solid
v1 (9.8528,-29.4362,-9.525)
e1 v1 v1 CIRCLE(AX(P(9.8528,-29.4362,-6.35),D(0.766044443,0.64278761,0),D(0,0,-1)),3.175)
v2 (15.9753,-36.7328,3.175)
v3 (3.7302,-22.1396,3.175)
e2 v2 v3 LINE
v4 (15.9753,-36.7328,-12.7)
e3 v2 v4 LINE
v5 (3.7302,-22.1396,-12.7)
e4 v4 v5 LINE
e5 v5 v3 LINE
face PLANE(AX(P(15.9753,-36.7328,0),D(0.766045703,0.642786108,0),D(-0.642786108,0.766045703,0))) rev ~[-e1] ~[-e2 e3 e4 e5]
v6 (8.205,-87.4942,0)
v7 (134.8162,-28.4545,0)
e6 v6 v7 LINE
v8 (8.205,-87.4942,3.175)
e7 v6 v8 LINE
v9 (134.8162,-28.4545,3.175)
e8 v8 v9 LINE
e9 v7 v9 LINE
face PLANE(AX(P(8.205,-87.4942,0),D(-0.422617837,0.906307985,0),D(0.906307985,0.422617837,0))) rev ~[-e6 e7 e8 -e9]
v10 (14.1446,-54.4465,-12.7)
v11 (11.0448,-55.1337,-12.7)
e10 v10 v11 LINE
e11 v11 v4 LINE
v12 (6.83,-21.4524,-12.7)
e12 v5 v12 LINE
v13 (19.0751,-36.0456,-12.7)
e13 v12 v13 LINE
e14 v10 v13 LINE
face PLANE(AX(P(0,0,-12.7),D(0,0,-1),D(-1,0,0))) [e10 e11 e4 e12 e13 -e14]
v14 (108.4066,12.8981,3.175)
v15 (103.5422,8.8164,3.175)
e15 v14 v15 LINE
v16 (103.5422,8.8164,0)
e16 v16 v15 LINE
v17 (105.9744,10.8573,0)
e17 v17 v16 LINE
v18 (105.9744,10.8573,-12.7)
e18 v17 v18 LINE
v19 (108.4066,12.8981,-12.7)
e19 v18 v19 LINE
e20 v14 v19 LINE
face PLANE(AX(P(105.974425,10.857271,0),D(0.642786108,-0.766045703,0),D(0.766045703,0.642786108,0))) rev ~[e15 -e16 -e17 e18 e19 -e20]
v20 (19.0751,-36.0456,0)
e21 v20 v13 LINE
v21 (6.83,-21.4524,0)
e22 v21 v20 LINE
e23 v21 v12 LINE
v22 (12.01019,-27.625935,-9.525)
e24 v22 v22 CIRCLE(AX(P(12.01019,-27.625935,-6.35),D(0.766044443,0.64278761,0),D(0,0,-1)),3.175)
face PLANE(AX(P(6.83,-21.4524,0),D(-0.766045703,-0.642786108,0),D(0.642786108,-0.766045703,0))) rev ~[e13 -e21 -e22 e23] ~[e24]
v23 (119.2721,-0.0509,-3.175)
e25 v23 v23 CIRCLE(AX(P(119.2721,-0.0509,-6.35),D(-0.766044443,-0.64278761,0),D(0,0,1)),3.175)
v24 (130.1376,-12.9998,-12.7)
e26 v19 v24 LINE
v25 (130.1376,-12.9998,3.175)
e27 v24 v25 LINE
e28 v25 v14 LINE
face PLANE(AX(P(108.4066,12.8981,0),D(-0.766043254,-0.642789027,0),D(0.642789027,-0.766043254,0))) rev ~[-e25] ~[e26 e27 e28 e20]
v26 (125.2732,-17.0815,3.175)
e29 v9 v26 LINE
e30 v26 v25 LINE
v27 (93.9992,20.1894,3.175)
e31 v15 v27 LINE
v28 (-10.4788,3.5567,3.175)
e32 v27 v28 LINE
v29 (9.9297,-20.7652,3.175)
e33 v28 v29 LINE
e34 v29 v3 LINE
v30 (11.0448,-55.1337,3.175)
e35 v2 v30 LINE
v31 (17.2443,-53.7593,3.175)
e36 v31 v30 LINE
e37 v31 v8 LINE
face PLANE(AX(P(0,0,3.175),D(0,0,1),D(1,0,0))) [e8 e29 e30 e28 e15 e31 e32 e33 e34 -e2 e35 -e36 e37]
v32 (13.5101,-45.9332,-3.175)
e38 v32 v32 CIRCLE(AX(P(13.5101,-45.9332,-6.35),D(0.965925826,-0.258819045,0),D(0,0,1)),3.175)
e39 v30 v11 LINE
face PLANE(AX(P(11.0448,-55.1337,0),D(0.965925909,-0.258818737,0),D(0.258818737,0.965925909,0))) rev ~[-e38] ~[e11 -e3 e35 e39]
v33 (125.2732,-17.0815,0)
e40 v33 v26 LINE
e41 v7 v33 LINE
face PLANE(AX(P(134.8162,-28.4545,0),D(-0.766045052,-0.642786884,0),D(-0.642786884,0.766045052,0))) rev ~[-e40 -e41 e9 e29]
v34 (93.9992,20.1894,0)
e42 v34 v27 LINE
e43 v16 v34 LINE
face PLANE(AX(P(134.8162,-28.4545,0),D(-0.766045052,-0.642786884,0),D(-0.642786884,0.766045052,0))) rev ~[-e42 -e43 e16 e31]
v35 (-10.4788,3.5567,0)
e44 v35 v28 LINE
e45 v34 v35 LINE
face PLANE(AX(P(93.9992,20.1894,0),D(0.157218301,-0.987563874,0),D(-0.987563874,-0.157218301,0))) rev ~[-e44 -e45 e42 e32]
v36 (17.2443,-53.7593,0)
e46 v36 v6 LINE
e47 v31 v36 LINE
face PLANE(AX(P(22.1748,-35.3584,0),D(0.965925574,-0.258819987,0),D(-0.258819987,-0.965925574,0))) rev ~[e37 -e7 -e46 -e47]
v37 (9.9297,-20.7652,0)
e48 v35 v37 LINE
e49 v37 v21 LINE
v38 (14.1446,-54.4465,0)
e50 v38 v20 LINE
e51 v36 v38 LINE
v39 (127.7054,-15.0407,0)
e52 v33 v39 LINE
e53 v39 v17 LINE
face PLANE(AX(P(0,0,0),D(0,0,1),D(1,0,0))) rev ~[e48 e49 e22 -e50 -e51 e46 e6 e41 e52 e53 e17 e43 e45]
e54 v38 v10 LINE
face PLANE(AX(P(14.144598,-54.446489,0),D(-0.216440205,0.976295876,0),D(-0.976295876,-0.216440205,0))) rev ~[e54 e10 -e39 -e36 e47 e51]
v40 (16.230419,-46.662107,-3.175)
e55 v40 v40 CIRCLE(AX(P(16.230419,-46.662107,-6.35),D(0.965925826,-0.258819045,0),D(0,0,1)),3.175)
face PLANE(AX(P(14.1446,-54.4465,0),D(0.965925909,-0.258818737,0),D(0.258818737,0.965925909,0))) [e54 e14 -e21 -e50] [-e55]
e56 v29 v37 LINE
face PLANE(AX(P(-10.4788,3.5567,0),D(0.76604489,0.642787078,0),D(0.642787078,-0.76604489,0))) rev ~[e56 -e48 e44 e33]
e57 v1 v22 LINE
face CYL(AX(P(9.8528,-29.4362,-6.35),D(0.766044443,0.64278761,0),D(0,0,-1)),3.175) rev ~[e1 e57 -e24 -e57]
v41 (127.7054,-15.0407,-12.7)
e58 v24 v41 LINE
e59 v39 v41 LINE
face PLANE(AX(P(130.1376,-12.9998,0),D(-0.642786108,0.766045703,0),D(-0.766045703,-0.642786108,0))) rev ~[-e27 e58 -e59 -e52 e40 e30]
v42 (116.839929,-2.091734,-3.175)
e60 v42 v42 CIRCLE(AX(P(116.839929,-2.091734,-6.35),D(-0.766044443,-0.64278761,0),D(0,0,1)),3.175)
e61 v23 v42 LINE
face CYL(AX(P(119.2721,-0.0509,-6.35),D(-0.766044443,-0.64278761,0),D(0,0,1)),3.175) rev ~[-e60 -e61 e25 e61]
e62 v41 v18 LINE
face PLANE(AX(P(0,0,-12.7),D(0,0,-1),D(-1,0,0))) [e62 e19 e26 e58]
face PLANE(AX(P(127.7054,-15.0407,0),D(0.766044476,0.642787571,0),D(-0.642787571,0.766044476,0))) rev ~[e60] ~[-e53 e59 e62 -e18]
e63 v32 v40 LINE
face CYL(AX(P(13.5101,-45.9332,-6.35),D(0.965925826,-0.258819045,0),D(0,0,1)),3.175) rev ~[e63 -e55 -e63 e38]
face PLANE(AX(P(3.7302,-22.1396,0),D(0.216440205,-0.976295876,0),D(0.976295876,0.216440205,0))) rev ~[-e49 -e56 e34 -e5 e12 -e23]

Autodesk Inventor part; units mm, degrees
ref_plane "YZ Plane" through (0, 0, 0) normal (1, 0, 0) x (0, 1, 0)
ref_plane "XZ Plane" through (0, 0, 0) normal (0, 1, 0) x (-1, 0, 0)
ref_plane "XY Plane" through (0, 0, 0) normal (0, 0, 1) x (1, 0, 0)
sketch "Sketch1" plane through (0, 0, 0) normal (0, 0, 1) x (1, 0, 0)
  line L0 (-10.4788, 3.5567) -> (22.1748, -35.3584)
  line L1 (-10.4788, 3.5567) -> (40.3212, 3.5567) construction
  line L2 (22.1748, -35.3584) -> (8.205, -87.4942)
  line L3 (8.205, -87.4942) -> (134.8162, -28.4545)
  line L4 (134.8162, -28.4545) -> (93.9992, 20.1894)
  line L5 (93.9992, 20.1894) -> (-10.4788, 3.5567)
  point P0 (0, 0)
  dimension "d0" = 50.8
  dimension "d1" = 50
  dimension "d2" = 53.975
  dimension "d3" = 125
  dimension "d4" = 139.7
  dimension "d5" = 50
  dimension "d6" = 63.5
  dimension "d7" = 75
extrude "Extrusion1" add sketch "Sketch1" along normal blind 3.175
sketch "Sketch2" plane through (0, 0, 3.175) normal (0, 0, 1) x (1, 0, 0)
  line L0 (-10.4788, 3.5567) -> (22.1748, -35.3584) projected
  line L1 (22.1748, -35.3584) -> (8.205, -87.4942) projected
  line L2 (22.1748, -35.3584) -> (9.9297, -20.7652)
  line L3 (22.1748, -35.3584) -> (17.2443, -53.7593)
  line L4 (9.9297, -20.7652) -> (3.7302, -22.1396)
  line L5 (17.2443, -53.7593) -> (11.0448, -55.1337)
  line L6 (15.9753, -36.7328) -> (3.7302, -22.1396)
  line L7 (15.9753, -36.7328) -> (11.0448, -55.1337)
  point P0 (0, 0)
  dimension "d10" = 19.05
  dimension "d11" = 19.05
  dimension "d12" = 6.35
  dimension "d13" = 6.35
  dimension "d14" = 6.35
extrude "Extrusion2" add sketch "Sketch2" against normal blind 3.175
sketch "Sketch3" plane through (0, 0, 0) normal (0, 0, -1) x (-1, 0, 0)
  line L0 (-17.2443, -53.7593) -> (-11.0448, -55.1337) projected
  line L1 (-11.0448, -55.1337) -> (-15.9753, -36.7328) projected
  line L2 (-15.9753, -36.7328) -> (-3.7302, -22.1396) projected
  line L3 (-3.7302, -22.1396) -> (-9.9297, -20.7652) projected
  line L4 (-3.7302, -22.1396) -> (-6.83, -21.4524)
  line L5 (-11.0448, -55.1337) -> (-14.1446, -54.4465)
  line L6 (-14.1446, -54.4465) -> (-19.0751, -36.0456)
  line L7 (-6.83, -21.4524) -> (-19.0751, -36.0456)
  point P0 (0, 0)
  dimension "d17" = 3.175
  dimension "d18" = 3.175
extrude "Extrusion3" add sketch "Sketch3" along normal blind 12.7
sketch "Sketch4" plane through (3.7302, -22.1396, -12.7) normal (-0.7660444, -0.6427876, 0) x (0, 0, 1)
  line L0 (0, -19.05) -> (0, 0) projected
  line L1 (15.875, -19.05) -> (0, -19.05) projected
  line L2 (0, -9.525) -> (6.35, -9.525)
  point P0 (12.7, 19.3577)
  dimension "d21" = 6.35
hole "Hole1" at (9.8528, -29.4362, -6.35) direction (0.7660444, 0.6427876, 0) diameter 6.35 end through all
sketch "Sketch5" plane through (15.9753, -36.7328, -12.7) normal (-0.9659258, 0.258819, 0) x (0, 0, 1)
  line L0 (0, -19.05) -> (0, 0) projected
  line L1 (15.875, -19.05) -> (0, -19.05) projected
  line L2 (0, -9.525) -> (6.35, -9.525)
  point P0 (12.7, 31.3464)
  dimension "d29" = 6.35
hole "Hole2" at (13.5101, -45.9332, -6.35) direction (0.9659258, -0.258819, 0) diameter 6.35 end through all
sketch "Sketch6" plane through (0, 0, 0) normal (0, 0, -1) x (-1, 0, 0)
  line L0 (-134.8162, -28.4545) -> (-93.9992, 20.1894) projected
  line L1 (-114.4077, -4.1326) -> (-103.5422, 8.8164)
  line L2 (-114.4077, -4.1326) -> (-125.2732, -17.0815)
  line L3 (-125.2732, -17.0815) -> (-130.1376, -12.9998)
  line L4 (-130.1376, -12.9998) -> (-108.4066, 12.8981)
  line L5 (-108.4066, 12.8981) -> (-103.5422, 8.8164)
  point P0 (0, 0)
  dimension "d37" = 16.9037
  dimension "d38" = 16.9037
  dimension "d39" = 6.35
  dimension "d40" = 33.8074
extrude "Extrusion4" add sketch "Sketch6" against normal blind 3.175
sketch "Sketch7" plane through (0, 0, 0) normal (0, 0, -1) x (-1, 0, 0)
  line L0 (-103.5422, 8.8164) -> (-108.4066, 12.8981) projected
  line L1 (-108.4066, 12.8981) -> (-130.1376, -12.9998) projected
  line L2 (-130.1376, -12.9998) -> (-125.2732, -17.0815) projected
  line L3 (-108.4066, 12.8981) -> (-130.1376, -12.9998)
  line L4 (-130.1376, -12.9998) -> (-127.7054, -15.0407)
  line L5 (-127.7054, -15.0407) -> (-105.9744, 10.8573)
  line L6 (-105.9744, 10.8573) -> (-108.4066, 12.8981)
  point P0 (0, 0)
  dimension "d43" = 3.175
extrude "Extrusion5" add sketch "Sketch7" along normal blind 12.7
sketch "Sketch8" plane through (108.4066, 12.8981, 3.175) normal (0.7660444, 0.6427876, 0) x (0, 0, -1)
  line L0 (15.875, 0) -> (15.875, -33.8074) projected
  line L1 (15.875, -16.9037) -> (9.525, -16.9037)
  point P0 (3.175, 59.8019)
  dimension "d46" = 6.35
hole "Hole3" at (119.2721, -0.0509, -6.35) direction (-0.7660444, -0.6427876, 0) diameter 6.35 end through all
properties part number "Right Bicep"
